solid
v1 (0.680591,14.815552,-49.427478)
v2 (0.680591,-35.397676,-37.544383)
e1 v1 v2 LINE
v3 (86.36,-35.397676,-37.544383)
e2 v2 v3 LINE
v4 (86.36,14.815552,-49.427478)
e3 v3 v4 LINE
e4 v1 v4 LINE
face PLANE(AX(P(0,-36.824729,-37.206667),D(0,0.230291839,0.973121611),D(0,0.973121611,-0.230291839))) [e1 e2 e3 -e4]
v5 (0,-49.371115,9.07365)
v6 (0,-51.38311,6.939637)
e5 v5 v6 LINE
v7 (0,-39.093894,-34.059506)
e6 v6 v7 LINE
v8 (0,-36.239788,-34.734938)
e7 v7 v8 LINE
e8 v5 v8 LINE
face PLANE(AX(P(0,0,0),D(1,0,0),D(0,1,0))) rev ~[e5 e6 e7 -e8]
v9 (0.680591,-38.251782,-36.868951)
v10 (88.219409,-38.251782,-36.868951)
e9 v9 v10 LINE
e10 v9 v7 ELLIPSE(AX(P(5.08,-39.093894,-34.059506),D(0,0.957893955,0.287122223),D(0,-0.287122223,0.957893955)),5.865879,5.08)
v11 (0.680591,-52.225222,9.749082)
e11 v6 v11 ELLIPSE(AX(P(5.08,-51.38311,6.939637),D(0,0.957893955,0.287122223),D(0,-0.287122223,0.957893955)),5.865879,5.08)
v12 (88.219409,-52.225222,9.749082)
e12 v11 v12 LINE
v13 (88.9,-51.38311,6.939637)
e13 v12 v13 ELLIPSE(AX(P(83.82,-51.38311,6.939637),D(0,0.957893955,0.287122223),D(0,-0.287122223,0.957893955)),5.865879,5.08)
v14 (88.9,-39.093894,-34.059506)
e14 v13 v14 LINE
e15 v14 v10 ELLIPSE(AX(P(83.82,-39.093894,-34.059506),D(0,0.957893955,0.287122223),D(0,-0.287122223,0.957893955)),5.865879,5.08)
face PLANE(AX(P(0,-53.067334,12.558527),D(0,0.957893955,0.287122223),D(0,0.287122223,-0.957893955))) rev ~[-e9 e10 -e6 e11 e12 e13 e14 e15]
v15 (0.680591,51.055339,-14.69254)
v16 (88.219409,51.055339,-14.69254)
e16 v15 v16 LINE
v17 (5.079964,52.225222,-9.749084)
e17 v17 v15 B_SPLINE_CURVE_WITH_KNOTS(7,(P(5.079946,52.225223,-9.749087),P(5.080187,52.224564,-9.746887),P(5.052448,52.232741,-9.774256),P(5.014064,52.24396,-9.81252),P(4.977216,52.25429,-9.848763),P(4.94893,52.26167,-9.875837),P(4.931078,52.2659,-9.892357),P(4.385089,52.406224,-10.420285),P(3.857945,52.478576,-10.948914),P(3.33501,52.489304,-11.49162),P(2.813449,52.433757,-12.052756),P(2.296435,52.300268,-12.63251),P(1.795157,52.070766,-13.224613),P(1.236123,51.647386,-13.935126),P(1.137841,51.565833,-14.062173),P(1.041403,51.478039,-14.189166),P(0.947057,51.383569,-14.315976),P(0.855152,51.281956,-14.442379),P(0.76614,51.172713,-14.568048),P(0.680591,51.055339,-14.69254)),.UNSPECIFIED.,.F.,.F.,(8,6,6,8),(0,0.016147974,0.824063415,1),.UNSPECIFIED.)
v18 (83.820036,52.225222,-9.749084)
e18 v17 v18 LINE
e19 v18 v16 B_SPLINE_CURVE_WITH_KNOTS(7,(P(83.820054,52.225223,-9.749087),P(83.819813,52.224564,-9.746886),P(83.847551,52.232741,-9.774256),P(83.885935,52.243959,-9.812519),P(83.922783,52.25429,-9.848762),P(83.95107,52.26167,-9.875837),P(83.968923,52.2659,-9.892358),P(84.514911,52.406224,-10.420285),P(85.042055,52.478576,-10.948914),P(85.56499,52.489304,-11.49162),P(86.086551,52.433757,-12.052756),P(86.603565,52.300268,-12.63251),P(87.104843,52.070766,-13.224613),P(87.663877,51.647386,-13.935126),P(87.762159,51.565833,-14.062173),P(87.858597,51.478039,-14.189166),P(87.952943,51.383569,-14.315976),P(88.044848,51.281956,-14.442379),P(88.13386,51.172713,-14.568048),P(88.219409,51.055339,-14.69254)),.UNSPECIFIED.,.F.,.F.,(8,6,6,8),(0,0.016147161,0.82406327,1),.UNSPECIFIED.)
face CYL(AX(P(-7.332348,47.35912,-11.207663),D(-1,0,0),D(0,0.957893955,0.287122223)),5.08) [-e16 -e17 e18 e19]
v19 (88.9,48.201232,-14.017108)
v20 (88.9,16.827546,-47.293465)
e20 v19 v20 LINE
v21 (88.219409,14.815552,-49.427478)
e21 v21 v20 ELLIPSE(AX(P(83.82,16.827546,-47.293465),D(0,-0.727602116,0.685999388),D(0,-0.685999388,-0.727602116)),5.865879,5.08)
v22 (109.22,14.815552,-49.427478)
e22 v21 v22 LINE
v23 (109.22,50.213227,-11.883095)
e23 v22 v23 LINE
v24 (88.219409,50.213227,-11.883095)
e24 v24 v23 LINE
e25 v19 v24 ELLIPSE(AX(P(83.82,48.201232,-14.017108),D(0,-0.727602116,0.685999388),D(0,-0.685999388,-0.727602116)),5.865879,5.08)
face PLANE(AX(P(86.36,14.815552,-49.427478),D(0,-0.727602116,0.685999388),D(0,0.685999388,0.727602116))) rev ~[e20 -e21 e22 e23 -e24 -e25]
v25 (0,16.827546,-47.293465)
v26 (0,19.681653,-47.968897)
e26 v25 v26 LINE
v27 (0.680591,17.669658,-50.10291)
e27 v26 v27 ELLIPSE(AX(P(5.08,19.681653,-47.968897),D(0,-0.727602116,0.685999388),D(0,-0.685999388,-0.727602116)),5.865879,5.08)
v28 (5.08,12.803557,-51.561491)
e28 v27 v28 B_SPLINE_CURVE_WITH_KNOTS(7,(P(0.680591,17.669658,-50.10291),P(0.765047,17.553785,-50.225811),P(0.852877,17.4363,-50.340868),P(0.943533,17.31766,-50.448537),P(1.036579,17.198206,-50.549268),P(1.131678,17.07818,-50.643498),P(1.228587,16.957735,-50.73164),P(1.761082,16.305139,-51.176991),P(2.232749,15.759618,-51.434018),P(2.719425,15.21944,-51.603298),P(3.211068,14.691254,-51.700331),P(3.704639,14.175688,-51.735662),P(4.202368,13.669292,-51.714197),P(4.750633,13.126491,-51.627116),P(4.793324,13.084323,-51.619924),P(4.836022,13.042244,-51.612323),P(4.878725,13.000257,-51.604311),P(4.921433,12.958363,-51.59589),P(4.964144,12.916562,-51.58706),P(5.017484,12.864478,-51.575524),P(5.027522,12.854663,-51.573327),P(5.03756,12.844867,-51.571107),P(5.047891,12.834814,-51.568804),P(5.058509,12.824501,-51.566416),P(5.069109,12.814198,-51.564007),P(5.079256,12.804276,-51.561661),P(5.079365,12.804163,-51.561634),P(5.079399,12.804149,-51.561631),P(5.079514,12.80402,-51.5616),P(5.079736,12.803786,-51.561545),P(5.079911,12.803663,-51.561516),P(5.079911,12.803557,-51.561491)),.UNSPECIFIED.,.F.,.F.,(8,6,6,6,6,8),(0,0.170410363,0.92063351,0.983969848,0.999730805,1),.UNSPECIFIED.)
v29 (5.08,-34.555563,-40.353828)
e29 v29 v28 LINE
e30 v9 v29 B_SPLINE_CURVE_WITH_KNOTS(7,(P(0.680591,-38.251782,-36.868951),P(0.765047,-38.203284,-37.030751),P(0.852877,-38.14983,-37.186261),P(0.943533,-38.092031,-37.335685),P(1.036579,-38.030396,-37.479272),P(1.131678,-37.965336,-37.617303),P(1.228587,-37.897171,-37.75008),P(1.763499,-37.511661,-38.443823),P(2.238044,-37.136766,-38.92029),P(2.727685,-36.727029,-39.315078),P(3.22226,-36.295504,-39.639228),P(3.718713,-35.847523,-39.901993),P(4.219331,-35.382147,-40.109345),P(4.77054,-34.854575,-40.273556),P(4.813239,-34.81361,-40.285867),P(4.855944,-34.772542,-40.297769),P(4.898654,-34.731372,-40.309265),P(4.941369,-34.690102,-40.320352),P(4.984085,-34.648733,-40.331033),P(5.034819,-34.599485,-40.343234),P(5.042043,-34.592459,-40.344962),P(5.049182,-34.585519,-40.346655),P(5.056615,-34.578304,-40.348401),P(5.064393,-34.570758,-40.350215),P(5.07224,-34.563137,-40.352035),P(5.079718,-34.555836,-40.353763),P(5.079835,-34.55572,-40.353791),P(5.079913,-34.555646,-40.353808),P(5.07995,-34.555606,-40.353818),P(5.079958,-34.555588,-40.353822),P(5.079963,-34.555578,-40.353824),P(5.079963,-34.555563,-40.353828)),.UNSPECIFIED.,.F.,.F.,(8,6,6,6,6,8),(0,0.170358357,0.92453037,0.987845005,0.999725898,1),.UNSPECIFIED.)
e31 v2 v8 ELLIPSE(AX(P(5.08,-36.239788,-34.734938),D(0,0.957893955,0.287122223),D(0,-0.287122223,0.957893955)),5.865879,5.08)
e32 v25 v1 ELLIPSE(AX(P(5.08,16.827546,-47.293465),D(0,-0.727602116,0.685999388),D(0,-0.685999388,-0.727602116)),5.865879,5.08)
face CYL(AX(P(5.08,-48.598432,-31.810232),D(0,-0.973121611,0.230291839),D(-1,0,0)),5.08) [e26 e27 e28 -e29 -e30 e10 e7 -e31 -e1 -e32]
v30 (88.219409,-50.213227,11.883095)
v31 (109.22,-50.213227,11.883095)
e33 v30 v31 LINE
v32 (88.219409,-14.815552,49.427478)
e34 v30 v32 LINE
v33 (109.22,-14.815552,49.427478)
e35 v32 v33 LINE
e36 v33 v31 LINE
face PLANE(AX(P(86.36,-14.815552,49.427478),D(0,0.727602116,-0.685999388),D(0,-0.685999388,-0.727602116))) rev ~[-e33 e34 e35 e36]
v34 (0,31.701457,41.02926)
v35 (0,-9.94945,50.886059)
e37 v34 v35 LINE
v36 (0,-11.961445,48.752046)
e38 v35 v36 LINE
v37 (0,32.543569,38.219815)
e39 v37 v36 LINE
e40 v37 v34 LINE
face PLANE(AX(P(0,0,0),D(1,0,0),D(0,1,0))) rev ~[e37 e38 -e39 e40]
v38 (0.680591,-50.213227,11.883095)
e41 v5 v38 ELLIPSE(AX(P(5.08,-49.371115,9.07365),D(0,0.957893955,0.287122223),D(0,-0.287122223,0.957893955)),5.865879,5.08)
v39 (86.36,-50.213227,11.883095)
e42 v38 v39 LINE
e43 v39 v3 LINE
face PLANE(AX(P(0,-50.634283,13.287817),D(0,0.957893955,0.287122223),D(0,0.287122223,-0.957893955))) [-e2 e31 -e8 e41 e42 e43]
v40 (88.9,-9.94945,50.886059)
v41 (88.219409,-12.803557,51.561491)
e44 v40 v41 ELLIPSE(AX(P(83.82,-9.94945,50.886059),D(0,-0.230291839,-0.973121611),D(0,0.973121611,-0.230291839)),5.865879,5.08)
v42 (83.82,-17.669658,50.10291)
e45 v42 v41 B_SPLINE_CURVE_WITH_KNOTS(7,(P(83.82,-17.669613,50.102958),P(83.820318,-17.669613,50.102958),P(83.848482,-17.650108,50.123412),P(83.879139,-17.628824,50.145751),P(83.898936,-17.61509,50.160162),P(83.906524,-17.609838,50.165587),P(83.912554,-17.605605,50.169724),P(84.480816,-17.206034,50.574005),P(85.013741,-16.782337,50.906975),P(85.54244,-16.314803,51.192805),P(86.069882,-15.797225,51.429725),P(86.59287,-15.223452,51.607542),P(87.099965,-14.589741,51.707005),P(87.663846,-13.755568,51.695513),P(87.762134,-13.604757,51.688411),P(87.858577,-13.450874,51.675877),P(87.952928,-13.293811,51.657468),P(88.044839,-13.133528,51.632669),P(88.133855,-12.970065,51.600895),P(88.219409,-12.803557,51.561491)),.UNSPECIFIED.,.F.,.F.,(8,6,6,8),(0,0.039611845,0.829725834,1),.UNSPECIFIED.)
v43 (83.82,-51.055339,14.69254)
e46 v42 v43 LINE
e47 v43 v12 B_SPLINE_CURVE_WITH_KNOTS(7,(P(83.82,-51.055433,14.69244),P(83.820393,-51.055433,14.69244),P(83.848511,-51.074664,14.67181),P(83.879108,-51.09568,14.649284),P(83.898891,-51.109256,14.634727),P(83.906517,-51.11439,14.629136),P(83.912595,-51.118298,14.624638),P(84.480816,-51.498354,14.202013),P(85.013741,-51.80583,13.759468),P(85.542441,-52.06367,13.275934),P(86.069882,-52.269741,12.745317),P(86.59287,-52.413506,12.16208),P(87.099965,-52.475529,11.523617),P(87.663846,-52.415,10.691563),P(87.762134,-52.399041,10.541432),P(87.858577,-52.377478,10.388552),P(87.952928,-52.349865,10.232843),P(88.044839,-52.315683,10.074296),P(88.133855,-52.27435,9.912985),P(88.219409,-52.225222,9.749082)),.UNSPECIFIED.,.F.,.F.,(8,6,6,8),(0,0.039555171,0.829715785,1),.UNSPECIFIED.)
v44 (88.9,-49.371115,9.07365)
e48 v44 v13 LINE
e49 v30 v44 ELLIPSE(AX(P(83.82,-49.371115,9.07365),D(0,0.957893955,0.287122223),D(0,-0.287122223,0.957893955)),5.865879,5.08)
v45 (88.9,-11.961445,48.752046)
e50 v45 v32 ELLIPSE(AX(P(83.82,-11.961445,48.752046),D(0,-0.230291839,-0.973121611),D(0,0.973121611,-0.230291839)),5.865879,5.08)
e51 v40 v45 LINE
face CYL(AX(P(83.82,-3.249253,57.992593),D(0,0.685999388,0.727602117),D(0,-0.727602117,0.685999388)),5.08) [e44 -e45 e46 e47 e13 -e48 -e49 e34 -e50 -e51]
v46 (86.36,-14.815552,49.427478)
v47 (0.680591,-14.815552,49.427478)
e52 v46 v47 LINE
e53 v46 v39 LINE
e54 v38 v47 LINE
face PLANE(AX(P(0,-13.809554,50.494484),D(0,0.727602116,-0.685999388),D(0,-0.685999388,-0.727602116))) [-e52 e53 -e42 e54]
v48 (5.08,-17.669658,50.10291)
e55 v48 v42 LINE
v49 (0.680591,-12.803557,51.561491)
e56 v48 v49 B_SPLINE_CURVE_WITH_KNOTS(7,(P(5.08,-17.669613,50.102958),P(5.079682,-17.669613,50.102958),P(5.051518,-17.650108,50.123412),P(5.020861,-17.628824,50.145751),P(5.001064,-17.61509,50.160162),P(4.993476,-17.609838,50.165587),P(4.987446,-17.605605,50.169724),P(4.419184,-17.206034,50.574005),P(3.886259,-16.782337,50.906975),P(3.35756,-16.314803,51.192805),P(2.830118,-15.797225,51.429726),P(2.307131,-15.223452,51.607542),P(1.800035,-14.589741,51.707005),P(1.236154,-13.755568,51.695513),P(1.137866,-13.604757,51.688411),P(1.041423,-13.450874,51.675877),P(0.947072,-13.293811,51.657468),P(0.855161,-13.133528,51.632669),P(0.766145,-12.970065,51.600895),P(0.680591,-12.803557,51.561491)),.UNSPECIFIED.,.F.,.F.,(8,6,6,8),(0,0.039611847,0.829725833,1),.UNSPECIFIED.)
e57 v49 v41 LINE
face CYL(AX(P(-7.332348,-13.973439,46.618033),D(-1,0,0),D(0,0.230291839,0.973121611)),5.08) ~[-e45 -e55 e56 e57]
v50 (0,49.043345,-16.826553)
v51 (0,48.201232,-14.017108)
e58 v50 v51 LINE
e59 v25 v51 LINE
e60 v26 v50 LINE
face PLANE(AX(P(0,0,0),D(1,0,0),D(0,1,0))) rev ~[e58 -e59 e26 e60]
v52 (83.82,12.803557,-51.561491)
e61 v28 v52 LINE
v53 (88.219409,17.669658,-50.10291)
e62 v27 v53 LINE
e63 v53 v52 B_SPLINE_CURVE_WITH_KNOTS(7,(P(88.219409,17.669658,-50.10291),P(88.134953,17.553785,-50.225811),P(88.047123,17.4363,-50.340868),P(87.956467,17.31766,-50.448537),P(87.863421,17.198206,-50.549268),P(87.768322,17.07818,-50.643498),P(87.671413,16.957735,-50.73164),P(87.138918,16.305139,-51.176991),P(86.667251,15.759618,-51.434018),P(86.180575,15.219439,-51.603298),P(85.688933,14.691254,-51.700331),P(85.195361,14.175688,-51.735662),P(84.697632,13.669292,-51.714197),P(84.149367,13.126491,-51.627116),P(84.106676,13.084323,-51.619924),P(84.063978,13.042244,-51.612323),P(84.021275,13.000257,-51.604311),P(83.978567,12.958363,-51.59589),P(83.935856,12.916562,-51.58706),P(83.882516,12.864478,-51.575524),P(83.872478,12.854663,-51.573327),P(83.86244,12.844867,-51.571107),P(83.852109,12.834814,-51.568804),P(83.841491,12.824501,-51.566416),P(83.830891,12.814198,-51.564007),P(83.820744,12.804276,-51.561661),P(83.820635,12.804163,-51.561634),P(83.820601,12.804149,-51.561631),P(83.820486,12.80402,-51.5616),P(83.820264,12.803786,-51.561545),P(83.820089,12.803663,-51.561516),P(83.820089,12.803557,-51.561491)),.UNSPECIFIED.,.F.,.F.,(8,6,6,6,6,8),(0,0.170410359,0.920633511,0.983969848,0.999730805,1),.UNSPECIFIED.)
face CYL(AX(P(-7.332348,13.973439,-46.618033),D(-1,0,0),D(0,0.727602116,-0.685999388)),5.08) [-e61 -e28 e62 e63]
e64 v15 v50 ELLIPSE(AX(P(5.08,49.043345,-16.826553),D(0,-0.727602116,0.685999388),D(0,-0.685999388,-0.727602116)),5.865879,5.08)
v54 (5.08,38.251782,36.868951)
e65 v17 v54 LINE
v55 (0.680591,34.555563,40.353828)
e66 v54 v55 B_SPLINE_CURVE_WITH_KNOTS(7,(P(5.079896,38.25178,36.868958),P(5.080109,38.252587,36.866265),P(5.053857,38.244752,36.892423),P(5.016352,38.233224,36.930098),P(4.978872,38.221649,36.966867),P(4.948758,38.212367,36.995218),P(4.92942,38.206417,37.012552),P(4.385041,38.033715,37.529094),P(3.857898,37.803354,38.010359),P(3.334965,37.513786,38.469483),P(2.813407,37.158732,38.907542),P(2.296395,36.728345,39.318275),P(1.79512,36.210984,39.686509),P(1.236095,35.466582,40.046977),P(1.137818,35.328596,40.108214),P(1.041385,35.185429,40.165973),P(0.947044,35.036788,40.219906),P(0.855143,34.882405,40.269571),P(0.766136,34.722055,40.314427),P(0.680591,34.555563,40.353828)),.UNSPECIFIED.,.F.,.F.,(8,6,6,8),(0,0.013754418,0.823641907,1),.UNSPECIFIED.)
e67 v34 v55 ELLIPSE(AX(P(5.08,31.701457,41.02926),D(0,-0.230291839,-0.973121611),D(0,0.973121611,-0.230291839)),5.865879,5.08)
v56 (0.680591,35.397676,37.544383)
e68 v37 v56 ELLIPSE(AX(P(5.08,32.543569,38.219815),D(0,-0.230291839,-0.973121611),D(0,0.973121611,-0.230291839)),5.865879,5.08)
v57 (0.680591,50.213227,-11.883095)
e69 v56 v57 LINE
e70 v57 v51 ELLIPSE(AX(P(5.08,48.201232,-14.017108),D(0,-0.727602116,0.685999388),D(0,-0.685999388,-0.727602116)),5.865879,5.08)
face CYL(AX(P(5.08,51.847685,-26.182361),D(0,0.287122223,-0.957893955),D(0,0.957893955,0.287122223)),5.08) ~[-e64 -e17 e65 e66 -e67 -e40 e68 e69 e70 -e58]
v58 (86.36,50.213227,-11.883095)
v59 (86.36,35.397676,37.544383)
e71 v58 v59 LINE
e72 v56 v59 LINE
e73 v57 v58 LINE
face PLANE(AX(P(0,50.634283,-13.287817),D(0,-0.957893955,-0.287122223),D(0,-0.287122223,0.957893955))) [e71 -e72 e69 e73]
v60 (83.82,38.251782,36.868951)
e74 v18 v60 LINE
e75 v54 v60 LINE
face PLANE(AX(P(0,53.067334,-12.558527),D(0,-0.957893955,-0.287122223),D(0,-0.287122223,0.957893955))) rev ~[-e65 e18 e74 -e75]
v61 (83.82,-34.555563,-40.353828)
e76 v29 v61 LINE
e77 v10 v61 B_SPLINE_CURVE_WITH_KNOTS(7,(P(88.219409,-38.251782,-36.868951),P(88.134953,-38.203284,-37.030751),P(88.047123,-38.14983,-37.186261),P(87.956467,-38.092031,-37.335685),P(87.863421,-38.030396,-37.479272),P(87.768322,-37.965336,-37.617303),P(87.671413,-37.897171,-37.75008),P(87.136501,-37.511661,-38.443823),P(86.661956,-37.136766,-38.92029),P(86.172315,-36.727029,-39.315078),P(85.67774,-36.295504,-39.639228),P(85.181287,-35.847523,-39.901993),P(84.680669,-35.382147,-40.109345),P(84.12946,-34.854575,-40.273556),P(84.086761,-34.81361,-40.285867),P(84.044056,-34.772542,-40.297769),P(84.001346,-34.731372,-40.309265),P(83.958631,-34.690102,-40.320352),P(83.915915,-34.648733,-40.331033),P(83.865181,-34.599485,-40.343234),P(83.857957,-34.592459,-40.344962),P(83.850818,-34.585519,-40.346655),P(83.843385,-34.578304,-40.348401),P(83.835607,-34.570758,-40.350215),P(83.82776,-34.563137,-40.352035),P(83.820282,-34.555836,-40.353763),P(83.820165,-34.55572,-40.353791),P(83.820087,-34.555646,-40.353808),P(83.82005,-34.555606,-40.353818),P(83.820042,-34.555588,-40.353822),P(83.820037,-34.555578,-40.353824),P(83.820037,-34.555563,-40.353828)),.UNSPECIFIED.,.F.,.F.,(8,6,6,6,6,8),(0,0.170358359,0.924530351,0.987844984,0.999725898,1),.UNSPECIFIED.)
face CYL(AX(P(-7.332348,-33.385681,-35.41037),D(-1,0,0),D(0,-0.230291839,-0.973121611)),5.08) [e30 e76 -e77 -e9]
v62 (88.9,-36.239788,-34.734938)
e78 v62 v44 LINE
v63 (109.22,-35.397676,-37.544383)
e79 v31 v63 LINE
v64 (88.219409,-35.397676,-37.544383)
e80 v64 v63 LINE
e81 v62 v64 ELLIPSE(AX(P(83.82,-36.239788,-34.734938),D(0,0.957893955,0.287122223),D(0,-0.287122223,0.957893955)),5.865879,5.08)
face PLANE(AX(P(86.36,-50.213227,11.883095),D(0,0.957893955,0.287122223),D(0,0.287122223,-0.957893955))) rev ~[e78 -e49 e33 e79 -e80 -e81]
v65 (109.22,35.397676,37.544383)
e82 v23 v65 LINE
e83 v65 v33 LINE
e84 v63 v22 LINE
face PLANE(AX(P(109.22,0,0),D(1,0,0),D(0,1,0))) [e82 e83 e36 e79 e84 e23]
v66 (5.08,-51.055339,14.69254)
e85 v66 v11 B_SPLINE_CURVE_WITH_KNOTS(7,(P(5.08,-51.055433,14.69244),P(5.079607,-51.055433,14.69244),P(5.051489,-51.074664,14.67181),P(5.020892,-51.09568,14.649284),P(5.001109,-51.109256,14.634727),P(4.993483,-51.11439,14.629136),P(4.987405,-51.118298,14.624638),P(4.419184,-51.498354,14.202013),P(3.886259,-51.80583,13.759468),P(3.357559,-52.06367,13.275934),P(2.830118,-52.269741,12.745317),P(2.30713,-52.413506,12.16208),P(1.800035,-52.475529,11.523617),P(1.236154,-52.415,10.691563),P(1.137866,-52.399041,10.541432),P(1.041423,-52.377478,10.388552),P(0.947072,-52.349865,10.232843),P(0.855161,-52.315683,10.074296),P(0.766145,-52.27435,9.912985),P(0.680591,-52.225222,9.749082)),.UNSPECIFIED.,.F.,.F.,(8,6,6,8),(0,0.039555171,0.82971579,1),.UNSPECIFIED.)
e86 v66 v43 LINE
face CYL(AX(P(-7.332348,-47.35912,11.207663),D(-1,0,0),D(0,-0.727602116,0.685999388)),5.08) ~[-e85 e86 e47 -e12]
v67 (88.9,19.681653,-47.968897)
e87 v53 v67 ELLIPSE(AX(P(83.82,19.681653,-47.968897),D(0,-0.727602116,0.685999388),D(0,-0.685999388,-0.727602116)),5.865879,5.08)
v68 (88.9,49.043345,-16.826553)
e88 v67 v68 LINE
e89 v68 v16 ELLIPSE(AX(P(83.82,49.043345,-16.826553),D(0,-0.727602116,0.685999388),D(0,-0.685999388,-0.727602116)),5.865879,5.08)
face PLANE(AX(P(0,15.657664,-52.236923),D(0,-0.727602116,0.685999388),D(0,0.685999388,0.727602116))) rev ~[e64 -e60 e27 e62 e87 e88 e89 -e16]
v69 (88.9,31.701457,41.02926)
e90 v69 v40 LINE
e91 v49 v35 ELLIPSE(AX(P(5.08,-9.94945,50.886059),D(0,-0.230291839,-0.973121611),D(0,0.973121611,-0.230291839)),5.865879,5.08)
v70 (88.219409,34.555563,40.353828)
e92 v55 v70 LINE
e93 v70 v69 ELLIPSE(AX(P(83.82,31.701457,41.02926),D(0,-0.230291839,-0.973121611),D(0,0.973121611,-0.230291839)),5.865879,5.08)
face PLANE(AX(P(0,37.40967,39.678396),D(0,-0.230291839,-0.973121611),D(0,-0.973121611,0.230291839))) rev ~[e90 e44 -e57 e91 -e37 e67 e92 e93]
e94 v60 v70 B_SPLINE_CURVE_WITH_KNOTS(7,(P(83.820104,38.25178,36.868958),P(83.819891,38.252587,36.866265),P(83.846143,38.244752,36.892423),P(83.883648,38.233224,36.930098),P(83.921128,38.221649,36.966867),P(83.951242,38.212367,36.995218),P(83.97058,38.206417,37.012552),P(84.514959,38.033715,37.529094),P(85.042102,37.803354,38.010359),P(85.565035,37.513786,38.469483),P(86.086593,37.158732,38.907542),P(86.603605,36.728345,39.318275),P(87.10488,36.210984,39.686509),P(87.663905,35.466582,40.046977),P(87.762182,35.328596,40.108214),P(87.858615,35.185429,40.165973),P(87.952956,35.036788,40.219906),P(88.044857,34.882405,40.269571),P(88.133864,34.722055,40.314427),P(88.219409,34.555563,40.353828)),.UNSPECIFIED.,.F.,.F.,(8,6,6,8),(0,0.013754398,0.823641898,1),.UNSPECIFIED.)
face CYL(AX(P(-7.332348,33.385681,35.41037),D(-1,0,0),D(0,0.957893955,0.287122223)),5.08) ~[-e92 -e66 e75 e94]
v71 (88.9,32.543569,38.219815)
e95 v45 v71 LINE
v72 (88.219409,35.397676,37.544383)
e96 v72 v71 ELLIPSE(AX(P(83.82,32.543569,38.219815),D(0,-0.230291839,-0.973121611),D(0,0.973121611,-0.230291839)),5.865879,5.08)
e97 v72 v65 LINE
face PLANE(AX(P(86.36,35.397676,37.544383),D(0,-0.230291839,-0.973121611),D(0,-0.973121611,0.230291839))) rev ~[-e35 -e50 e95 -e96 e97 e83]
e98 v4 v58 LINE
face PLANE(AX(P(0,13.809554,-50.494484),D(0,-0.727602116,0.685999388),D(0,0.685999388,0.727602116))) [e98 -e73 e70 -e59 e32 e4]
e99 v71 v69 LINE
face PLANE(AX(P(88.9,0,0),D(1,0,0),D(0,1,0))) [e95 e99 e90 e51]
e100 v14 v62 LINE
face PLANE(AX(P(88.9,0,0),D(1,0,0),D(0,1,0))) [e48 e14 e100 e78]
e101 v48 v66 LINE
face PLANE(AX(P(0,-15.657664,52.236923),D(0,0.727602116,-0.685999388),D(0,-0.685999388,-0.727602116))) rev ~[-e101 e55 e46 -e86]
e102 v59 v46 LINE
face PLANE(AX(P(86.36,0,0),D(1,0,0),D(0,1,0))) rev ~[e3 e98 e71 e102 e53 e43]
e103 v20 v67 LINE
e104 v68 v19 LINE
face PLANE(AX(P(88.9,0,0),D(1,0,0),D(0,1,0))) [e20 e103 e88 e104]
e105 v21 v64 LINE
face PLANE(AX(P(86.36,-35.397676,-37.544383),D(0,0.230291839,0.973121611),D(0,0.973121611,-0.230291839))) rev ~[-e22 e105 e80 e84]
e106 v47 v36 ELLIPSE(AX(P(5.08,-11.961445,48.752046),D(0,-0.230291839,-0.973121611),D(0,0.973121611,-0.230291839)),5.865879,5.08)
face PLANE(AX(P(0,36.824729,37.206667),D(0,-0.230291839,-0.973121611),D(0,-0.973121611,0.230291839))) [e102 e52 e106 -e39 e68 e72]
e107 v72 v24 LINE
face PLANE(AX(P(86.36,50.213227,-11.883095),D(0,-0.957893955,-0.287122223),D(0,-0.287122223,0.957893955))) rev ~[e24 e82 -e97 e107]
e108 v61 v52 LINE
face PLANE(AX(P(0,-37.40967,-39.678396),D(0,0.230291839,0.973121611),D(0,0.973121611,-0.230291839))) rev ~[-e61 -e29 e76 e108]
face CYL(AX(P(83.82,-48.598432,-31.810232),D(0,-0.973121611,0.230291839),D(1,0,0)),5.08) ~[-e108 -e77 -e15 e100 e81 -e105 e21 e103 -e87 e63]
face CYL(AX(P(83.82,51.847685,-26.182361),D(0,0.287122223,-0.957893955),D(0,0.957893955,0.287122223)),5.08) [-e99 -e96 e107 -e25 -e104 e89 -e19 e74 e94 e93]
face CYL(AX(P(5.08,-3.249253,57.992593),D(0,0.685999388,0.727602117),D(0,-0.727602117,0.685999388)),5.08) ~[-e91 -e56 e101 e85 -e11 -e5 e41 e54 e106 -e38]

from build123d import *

# Parameters (mm, degrees)
F1_DEPTH    = 88.9
F2_T        = -2.54
F3_T1_DEPTH = 103.5646968374
F3_T3_DEPTH = 79.9330955154
F4_T1_DEPTH = 103.5646968374
F4_T3_DEPTH = 79.9330955154
F5_T1_DEPTH = 103.5646968374
F5_T3_DEPTH = 79.9330955154
F6_DEPTH    = 22.86


# Not quite as in the source:
# - a fillet or chamfer that OpenCascade refuses, or shapes differently, is made with other operations: its cross-section is extruded or revolved along the edge and cut away or added


with BuildPart() as f1:
    # F0 (on Right) → F1 (new body)
    with BuildSketch(Plane.YZ):
        Polygon((-15.657663601, 52.2369225457), (-53.0673337406, 12.5585268304), (-37.4096701396, -39.6783957152), (15.657663601, -52.2369225457), (53.0673337406, -12.5585268304), (37.4096701396, 39.6783957152), align=None)
    extrude(amount=F1_DEPTH)

    # F2
    f2_openings = [f1.faces().sort_by_distance(p)[0] for p in [
        (0, 0, 0),
    ]]
    offset(amount=F2_T, openings=f2_openings)

    # F3: fillet of radius 5.08 on 4 edges, made by hand

    # F3_s2 → F3_t1 (cut)
    with BuildSketch(Plane.YZ.offset(-7.3323484187)):
        with BuildLine():
            ThreePointArc((-12.8035569199, 51.5614905463), (-15.4320203518, 51.484134056), (-17.6696582116, 50.1029096544))
            Line((-17.6696582116, 50.1029096544), (-15.657663601, 52.2369225457))
            Line((-15.657663601, 52.2369225457), (-12.8035569199, 51.5614905463))
        make_face()
        with BuildLine():
            ThreePointArc((-51.05533913, 14.6925397217), (-52.3025781603, 12.3775453716), (-52.22522167, 9.7490819397))
            Line((-52.22522167, 9.7490819397), (-53.0673337406, 12.5585268304))
            Line((-53.0673337406, 12.5585268304), (-51.05533913, 14.6925397217))
        make_face()
    extrude(amount=F3_T1_DEPTH, mode=Mode.SUBTRACT)

    # F3_s4 → F3_t3 (cut)
    with BuildSketch(Plane(origin=(0, 27.4170272951, 29.0797447369), x_dir=(1, 0, 0), z_dir=(0, -0.6859993878, -0.7276021165))):
        with BuildLine():
            ThreePointArc((5.08, 47.2270460633), (1.4878975516, 45.7391485117), (0, 42.1470460633))
            Line((0, 42.1470460633), (0, 47.2270460633))
            Line((0, 47.2270460633), (5.08, 47.2270460633))
        make_face()
        with BuildLine():
            ThreePointArc((83.82, 47.2270460633), (87.4121024484, 45.7391485117), (88.9, 42.1470460633))
            Line((88.9, 42.1470460633), (88.9, 47.2270460633))
            Line((88.9, 47.2270460633), (83.82, 47.2270460633))
        make_face()
    extrude(amount=F3_T3_DEPTH, mode=Mode.SUBTRACT)

    # F4: fillet of radius 5.08 on 4 edges, made by hand

    # F4_s2 → F4_t1 (cut)
    with BuildSketch(Plane.YZ.offset(-7.3323484187)):
        with BuildLine():
            ThreePointArc((52.22522167, -9.7490819397), (52.3025781603, -12.3775453716), (51.05533913, -14.6925397217))
            Line((51.05533913, -14.6925397217), (53.0673337406, -12.5585268304))
            Line((53.0673337406, -12.5585268304), (52.22522167, -9.7490819397))
        make_face()
        with BuildLine():
            ThreePointArc((38.2517822101, 36.8689508245), (36.8705578085, 39.1065886844), (34.5555634584, 40.3538277147))
            Line((34.5555634584, 40.3538277147), (37.4096701396, 39.6783957152))
            Line((37.4096701396, 39.6783957152), (38.2517822101, 36.8689508245))
        make_face()
    extrude(amount=F4_T1_DEPTH, mode=Mode.SUBTRACT)

    # F4_s4 → F4_t3 (cut)
    with BuildSketch(Plane(origin=(0, 11.4752840302, -38.2837145023), x_dir=(1, 0, 0), z_dir=(0, -0.2871222228, 0.9578939551))):
        with BuildLine():
            ThreePointArc((5.08, 47.2270460633), (1.4878975516, 45.7391485117), (0, 42.1470460633))
            Line((0, 42.1470460633), (0, 47.2270460633))
            Line((0, 47.2270460633), (5.08, 47.2270460633))
        make_face()
        with BuildLine():
            ThreePointArc((83.82, 47.2270460633), (87.4121024484, 45.7391485117), (88.9, 42.1470460633))
            Line((88.9, 42.1470460633), (88.9, 47.2270460633))
            Line((88.9, 47.2270460633), (83.82, 47.2270460633))
        make_face()
    extrude(amount=F4_T3_DEPTH, mode=Mode.SUBTRACT)

    # F5: fillet of radius 5.08 on 4 edges, made by hand

    # F5_s2 → F5_t1 (cut)
    with BuildSketch(Plane.YZ.offset(-7.3323484187)):
        with BuildLine():
            ThreePointArc((-34.5555634584, -40.3538277147), (-36.8705578085, -39.1065886844), (-38.2517822101, -36.8689508245))
            Line((-38.2517822101, -36.8689508245), (-37.4096701396, -39.6783957152))
            Line((-37.4096701396, -39.6783957152), (-34.5555634584, -40.3538277147))
        make_face()
        with BuildLine():
            ThreePointArc((17.6696582116, -50.1029096544), (15.4320203518, -51.484134056), (12.8035569199, -51.5614905463))
            Line((12.8035569199, -51.5614905463), (15.657663601, -52.2369225457))
            Line((15.657663601, -52.2369225457), (17.6696582116, -50.1029096544))
        make_face()
    extrude(amount=F5_T1_DEPTH, mode=Mode.SUBTRACT)

    # F5_s4 → F5_t3 (cut)
    with BuildSketch(Plane(origin=(0, -38.8923113253, 9.2039697654), x_dir=(1, 0, 0), z_dir=(0, 0.9731216106, -0.2302918386))):
        with BuildLine():
            ThreePointArc((0, 42.1470460633), (1.4878975516, 45.7391485117), (5.08, 47.2270460633))
            Line((5.08, 47.2270460633), (0, 47.2270460633))
            Line((0, 47.2270460633), (0, 42.1470460633))
        make_face()
        with BuildLine():
            ThreePointArc((88.9, 42.1470460633), (87.4121024484, 45.7391485117), (83.82, 47.2270460633))
            Line((83.82, 47.2270460633), (88.9, 47.2270460633))
            Line((88.9, 47.2270460633), (88.9, 42.1470460633))
        make_face()
    extrude(amount=F5_T3_DEPTH, mode=Mode.SUBTRACT)

    # F6 (add): a face of the model
    f6_faces = [f1.faces().sort_by_distance(p)[0] for p in [
        (86.36, 0, 0),
    ]]
    extrude(f6_faces, amount=-F6_DEPTH)


solid = f1.part
